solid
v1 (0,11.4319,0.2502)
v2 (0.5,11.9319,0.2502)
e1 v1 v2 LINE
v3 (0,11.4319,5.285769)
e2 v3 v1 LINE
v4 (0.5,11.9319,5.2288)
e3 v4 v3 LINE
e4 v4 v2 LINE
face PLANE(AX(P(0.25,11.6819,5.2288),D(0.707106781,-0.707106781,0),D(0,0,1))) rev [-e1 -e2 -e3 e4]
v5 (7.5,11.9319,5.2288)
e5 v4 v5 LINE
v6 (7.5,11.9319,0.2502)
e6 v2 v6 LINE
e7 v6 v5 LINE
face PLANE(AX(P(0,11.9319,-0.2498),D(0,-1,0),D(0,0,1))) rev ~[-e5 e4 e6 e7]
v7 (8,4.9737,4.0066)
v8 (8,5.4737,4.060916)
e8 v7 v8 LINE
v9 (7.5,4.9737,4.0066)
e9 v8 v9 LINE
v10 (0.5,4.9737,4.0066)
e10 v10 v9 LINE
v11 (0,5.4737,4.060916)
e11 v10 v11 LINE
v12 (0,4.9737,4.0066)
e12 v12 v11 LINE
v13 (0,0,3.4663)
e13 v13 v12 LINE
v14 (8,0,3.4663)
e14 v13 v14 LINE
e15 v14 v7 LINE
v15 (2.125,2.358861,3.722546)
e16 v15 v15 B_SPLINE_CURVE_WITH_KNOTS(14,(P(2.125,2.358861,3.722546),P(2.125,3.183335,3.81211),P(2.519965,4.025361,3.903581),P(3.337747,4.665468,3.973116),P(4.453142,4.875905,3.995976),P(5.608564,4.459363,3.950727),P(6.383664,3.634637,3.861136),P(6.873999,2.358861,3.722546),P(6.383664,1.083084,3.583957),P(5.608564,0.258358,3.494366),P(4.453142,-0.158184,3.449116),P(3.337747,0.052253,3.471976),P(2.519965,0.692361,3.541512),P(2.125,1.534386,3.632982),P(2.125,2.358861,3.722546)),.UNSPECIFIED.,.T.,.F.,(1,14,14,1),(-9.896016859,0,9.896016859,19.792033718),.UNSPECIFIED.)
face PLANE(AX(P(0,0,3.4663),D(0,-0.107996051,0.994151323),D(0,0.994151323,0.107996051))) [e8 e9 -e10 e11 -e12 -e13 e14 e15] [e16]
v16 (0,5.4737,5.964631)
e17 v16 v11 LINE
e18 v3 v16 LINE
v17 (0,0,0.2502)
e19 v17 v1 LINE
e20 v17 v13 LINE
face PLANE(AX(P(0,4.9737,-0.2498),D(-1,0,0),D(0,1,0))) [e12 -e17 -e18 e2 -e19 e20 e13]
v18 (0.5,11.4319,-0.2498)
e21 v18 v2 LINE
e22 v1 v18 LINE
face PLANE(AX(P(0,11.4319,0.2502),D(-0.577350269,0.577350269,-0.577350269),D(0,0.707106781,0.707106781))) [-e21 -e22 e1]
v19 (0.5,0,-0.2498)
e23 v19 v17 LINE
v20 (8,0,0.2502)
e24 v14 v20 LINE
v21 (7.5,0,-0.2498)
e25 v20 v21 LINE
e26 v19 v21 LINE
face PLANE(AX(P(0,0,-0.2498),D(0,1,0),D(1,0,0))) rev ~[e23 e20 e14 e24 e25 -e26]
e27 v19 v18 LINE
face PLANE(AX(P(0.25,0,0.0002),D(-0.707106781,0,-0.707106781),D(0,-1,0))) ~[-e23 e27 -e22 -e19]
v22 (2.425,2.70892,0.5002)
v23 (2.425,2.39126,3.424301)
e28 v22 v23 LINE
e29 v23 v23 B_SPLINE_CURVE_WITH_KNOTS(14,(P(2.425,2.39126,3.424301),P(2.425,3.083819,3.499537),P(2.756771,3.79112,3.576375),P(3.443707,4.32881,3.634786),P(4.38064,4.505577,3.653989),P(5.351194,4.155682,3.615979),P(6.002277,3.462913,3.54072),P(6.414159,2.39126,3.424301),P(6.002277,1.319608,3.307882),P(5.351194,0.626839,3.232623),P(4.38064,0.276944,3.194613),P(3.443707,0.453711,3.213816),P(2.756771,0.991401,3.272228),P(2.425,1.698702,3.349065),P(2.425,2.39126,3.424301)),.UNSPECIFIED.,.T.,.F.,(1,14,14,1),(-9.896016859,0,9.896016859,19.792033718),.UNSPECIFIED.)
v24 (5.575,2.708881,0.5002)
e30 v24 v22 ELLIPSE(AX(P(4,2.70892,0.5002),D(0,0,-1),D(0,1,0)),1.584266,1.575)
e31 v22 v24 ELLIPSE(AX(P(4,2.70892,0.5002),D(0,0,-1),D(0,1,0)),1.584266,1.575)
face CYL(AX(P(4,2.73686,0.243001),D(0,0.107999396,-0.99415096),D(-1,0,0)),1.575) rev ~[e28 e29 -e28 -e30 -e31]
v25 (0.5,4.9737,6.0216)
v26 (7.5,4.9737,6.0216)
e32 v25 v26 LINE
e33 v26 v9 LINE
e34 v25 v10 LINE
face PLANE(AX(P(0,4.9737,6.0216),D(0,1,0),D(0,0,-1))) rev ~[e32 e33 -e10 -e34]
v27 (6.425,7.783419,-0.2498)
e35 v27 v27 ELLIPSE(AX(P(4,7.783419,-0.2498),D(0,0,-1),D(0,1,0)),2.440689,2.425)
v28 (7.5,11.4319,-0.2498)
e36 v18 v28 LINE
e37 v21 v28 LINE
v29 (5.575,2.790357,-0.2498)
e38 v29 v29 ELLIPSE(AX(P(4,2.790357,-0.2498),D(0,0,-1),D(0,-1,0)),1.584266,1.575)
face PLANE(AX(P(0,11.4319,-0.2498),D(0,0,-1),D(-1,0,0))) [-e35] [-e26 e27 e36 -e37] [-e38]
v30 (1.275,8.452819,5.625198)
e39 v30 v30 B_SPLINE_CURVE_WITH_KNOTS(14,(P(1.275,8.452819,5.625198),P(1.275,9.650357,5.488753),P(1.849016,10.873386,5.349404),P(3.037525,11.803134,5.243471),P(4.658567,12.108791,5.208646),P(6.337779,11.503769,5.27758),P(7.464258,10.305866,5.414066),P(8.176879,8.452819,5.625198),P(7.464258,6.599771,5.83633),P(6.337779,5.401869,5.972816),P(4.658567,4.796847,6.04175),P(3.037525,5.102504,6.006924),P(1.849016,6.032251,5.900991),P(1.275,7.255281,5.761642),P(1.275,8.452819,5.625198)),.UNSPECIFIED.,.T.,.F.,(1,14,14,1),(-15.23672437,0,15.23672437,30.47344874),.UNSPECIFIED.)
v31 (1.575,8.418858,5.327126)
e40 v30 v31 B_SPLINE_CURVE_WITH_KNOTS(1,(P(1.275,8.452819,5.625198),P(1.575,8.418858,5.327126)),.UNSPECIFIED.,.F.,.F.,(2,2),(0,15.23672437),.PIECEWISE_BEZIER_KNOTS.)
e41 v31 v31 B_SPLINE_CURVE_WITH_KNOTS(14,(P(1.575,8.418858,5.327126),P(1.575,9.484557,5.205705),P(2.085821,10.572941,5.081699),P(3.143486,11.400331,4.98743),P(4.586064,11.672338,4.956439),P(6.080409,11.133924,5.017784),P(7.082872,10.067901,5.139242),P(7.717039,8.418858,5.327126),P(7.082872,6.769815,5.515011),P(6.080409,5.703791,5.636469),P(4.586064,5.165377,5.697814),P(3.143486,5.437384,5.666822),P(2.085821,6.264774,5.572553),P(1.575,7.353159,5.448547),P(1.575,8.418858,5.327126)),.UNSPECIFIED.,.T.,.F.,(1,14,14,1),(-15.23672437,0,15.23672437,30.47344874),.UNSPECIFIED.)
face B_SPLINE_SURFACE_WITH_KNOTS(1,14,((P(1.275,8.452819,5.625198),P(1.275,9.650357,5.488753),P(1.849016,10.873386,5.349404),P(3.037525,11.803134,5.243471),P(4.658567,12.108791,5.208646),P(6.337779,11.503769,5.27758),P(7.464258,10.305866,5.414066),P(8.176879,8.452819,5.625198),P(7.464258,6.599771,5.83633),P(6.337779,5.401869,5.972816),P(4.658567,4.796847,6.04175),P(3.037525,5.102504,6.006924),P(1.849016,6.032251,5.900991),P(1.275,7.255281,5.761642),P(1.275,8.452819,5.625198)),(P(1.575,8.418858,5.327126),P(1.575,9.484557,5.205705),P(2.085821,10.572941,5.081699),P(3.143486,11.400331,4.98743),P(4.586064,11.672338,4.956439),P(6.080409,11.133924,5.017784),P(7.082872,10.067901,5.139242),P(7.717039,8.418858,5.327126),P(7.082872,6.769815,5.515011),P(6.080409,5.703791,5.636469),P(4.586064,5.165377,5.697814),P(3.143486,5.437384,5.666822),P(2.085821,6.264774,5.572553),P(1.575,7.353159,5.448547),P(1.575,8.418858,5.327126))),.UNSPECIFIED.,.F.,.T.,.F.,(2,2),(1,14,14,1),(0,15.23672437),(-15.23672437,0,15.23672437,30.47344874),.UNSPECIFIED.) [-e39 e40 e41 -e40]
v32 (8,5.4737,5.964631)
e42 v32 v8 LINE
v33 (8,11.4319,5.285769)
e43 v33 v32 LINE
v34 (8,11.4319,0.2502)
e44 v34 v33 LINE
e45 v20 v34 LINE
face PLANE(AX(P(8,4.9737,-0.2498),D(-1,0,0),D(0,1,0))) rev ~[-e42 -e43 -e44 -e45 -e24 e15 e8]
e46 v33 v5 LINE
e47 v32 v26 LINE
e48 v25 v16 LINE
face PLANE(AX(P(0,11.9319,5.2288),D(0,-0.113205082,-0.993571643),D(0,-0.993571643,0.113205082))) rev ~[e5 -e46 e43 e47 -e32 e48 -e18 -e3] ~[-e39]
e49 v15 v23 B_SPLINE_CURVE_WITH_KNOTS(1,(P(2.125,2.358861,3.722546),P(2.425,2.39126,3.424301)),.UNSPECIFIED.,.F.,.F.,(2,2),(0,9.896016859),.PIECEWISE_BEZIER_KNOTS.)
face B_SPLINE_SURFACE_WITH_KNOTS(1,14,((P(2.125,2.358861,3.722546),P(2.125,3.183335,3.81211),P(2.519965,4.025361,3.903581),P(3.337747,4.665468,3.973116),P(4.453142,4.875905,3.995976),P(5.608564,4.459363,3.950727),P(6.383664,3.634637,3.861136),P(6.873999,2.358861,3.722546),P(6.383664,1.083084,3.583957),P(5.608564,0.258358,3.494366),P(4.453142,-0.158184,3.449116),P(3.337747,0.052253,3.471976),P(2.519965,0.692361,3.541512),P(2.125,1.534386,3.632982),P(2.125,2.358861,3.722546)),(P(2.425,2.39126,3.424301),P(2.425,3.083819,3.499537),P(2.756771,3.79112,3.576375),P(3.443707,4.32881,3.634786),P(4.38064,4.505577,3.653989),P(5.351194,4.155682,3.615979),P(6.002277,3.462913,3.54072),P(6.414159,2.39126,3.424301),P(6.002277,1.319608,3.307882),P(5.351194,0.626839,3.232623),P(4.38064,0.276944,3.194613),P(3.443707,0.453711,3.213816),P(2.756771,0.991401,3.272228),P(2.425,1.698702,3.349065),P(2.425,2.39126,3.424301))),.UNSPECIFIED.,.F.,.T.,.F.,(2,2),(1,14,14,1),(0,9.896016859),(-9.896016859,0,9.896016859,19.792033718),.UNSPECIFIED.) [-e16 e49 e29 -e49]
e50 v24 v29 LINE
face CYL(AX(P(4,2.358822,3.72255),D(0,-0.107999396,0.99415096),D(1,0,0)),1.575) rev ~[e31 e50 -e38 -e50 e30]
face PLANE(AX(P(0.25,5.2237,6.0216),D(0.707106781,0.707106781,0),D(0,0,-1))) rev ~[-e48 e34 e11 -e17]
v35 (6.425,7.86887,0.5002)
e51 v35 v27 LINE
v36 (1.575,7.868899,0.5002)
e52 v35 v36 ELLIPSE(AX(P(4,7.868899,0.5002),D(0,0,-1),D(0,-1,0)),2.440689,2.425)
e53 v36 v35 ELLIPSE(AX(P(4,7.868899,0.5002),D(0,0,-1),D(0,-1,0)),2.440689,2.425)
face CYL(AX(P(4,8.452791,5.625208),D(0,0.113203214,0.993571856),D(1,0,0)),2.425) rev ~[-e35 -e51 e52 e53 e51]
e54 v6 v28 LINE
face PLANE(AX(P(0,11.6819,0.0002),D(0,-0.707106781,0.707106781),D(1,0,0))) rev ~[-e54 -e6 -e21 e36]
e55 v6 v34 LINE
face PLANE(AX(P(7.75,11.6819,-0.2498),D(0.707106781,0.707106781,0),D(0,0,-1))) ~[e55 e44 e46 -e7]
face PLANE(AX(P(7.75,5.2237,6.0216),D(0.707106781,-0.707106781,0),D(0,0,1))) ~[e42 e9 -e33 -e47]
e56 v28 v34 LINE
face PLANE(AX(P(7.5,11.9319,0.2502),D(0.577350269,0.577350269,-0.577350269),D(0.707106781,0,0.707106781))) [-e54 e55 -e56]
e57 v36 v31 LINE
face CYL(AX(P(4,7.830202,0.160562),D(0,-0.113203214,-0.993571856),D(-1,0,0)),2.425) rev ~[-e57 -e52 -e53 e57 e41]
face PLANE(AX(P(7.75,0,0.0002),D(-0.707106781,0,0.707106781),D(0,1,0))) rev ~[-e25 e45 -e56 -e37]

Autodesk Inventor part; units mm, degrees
ref_plane "YZ Plane" through (0, 0, 0) normal (1, 0, 0) x (0, 1, 0)
ref_plane "XZ Plane" through (0, 0, 0) normal (0, 1, 0) x (-1, 0, 0)
ref_plane "XY Plane" through (0, 0, 0) normal (0, 0, 1) x (1, 0, 0)
sketch "Skizze5" plane through (0, 0, 0) normal (1, 0, 0) x (0, 1, 0)
  line L0 (0, 0) -> (0.5, 0)
  line L1 (0.5, 0) -> (4.9737, 0.486)
  line L2 (4.9737, 0.486) -> (11.4319, -0.2498)
  line L3 (11.4319, -0.2498) -> (11.9319, -0.2498)
  line L4 (11.9319, -0.2498) -> (11.9319, 5.2288)
  line L5 (11.9319, 5.2288) -> (4.9737, 6.0216)
  line L6 (0, 3.4663) -> (0, 0)
  line L7 (0, 3.4663) -> (4.9737, 4.0066)
  line L8 (4.9737, 8.0188) -> (4.9737, 2.9641) construction
  line L9 (4.9737, 6.0216) -> (4.9737, 4.0066)
  point P0 (0, 0)
  dimension "d21" = 0.5
  dimension "d22" = 6.2
  dimension "d23" = 6.5
  dimension "d24" = 4.5
  dimension "d25" = 6.5
  dimension "d26" = 5.5
  dimension "d27" = 3.5
extrude "Extrusion3" add sketch "Skizze5" along normal blind 8
sketch "Skizze6" plane through (8, 11.4319, -0.2498) normal (0, -0.1132032, -0.9935719) x (-1, 0, 0)
  circle A0 centre (4, -3.625) radius 2.425
  line L0 (4, 1.7492) -> (4, -8.8787)
  line L1 (-1.2914, -3.625) -> (9.5036, -3.625)
  line L2 (8, -0.1234) -> (8, -7.1266) projected
  line L3 (8, 0.4968) -> (0, 0.4968) projected
  point P0 (8, -11.3867)
  point P1 (8, -3.625)
  point P2 (4, 0.4968)
  dimension "d30" = 4.85
extrude "Extrusion4" cut sketch "Skizze6" against normal through all
sketch "Skizze7" plane through (8, 4.9737, 0.486) normal (0, 0.1079994, -0.994151) x (-1, 0, 0)
  line L0 (-0.408, -2.25) -> (9.5226, -2.25)
  line L1 (4, -0.248) -> (4, -7.2475)
  line L2 (8, -4.9971) -> (0, -4.9971) projected
  line L3 (8, -4.5) -> (8, 0) projected
  circle A0 centre (4, -2.25) radius 1.575
  point P0 (4, -4.9971)
  point P1 (8, -2.25)
  dimension "d33" = 3.15
extrude "Extrusion5" cut sketch "Skizze7" against normal through all
sketch "Skizze8" plane through (0, 11.4319, -0.2498) normal (0, 0, -1) x (-1, 0, 0)
  line L0 (-8, -6.4582) -> (-8, 0) projected
  line L1 (-8, -10.9319) -> (-8, -6.4582) projected
  line L2 (-8, -11.4319) -> (-8, -10.9319) projected
  line L3 (0, -11.4319) -> (-8, -11.4319) projected
  line L4 (0, -11.4319) -> (0, -10.9319) projected
  line L5 (0, -10.9319) -> (0, -6.4582) projected
  line L6 (0, -6.4582) -> (0, 0) projected
  line L7 (0, 0) -> (0, 0.5) projected
  line L8 (0, 0.5) -> (-8, 0.5) projected
  line L9 (-8, 0) -> (-8, 0.5) projected
extrude "Extrusion6" add sketch "Skizze8" against normal blind 0.75
sketch "Skizze9" plane through (0, 4.9737, 6.0216) normal (0, 0.1132032, 0.9935719) x (1, 0, 0)
  circle A0 centre (4, 3.5016) radius 2.425 projected
  point P0 (0, -4.26)
extrude "Extrusion7" cut sketch "Skizze9" against normal through all
sketch "Skizze10" plane through (0, 0, 3.4663) normal (0, -0.1079994, 0.994151) x (1, 0, 0)
  circle A0 centre (4, 2.3727) radius 1.575 projected
  point P0 (0, -0.3744)
extrude "Extrusion8" cut sketch "Skizze10" against normal through all
chamfer "Fase2" distance 0.5 angle 45 7 edges at (8, 5.9659, -0.2498) (4, 11.9319, -0.2498) (8, 11.9319, 2.4895) (0, 5.9659, -0.2498) (0, 11.9319, 2.4895) (8, 4.9737, 5.0141) (0, 4.9737, 5.0141)
chamfer "Fase3" distance 0.3 angle 45 2 edges at (6.425, 8.4528, 5.6252) (5.575, 2.3588, 3.7225)
properties part number "led_holder_v12"
